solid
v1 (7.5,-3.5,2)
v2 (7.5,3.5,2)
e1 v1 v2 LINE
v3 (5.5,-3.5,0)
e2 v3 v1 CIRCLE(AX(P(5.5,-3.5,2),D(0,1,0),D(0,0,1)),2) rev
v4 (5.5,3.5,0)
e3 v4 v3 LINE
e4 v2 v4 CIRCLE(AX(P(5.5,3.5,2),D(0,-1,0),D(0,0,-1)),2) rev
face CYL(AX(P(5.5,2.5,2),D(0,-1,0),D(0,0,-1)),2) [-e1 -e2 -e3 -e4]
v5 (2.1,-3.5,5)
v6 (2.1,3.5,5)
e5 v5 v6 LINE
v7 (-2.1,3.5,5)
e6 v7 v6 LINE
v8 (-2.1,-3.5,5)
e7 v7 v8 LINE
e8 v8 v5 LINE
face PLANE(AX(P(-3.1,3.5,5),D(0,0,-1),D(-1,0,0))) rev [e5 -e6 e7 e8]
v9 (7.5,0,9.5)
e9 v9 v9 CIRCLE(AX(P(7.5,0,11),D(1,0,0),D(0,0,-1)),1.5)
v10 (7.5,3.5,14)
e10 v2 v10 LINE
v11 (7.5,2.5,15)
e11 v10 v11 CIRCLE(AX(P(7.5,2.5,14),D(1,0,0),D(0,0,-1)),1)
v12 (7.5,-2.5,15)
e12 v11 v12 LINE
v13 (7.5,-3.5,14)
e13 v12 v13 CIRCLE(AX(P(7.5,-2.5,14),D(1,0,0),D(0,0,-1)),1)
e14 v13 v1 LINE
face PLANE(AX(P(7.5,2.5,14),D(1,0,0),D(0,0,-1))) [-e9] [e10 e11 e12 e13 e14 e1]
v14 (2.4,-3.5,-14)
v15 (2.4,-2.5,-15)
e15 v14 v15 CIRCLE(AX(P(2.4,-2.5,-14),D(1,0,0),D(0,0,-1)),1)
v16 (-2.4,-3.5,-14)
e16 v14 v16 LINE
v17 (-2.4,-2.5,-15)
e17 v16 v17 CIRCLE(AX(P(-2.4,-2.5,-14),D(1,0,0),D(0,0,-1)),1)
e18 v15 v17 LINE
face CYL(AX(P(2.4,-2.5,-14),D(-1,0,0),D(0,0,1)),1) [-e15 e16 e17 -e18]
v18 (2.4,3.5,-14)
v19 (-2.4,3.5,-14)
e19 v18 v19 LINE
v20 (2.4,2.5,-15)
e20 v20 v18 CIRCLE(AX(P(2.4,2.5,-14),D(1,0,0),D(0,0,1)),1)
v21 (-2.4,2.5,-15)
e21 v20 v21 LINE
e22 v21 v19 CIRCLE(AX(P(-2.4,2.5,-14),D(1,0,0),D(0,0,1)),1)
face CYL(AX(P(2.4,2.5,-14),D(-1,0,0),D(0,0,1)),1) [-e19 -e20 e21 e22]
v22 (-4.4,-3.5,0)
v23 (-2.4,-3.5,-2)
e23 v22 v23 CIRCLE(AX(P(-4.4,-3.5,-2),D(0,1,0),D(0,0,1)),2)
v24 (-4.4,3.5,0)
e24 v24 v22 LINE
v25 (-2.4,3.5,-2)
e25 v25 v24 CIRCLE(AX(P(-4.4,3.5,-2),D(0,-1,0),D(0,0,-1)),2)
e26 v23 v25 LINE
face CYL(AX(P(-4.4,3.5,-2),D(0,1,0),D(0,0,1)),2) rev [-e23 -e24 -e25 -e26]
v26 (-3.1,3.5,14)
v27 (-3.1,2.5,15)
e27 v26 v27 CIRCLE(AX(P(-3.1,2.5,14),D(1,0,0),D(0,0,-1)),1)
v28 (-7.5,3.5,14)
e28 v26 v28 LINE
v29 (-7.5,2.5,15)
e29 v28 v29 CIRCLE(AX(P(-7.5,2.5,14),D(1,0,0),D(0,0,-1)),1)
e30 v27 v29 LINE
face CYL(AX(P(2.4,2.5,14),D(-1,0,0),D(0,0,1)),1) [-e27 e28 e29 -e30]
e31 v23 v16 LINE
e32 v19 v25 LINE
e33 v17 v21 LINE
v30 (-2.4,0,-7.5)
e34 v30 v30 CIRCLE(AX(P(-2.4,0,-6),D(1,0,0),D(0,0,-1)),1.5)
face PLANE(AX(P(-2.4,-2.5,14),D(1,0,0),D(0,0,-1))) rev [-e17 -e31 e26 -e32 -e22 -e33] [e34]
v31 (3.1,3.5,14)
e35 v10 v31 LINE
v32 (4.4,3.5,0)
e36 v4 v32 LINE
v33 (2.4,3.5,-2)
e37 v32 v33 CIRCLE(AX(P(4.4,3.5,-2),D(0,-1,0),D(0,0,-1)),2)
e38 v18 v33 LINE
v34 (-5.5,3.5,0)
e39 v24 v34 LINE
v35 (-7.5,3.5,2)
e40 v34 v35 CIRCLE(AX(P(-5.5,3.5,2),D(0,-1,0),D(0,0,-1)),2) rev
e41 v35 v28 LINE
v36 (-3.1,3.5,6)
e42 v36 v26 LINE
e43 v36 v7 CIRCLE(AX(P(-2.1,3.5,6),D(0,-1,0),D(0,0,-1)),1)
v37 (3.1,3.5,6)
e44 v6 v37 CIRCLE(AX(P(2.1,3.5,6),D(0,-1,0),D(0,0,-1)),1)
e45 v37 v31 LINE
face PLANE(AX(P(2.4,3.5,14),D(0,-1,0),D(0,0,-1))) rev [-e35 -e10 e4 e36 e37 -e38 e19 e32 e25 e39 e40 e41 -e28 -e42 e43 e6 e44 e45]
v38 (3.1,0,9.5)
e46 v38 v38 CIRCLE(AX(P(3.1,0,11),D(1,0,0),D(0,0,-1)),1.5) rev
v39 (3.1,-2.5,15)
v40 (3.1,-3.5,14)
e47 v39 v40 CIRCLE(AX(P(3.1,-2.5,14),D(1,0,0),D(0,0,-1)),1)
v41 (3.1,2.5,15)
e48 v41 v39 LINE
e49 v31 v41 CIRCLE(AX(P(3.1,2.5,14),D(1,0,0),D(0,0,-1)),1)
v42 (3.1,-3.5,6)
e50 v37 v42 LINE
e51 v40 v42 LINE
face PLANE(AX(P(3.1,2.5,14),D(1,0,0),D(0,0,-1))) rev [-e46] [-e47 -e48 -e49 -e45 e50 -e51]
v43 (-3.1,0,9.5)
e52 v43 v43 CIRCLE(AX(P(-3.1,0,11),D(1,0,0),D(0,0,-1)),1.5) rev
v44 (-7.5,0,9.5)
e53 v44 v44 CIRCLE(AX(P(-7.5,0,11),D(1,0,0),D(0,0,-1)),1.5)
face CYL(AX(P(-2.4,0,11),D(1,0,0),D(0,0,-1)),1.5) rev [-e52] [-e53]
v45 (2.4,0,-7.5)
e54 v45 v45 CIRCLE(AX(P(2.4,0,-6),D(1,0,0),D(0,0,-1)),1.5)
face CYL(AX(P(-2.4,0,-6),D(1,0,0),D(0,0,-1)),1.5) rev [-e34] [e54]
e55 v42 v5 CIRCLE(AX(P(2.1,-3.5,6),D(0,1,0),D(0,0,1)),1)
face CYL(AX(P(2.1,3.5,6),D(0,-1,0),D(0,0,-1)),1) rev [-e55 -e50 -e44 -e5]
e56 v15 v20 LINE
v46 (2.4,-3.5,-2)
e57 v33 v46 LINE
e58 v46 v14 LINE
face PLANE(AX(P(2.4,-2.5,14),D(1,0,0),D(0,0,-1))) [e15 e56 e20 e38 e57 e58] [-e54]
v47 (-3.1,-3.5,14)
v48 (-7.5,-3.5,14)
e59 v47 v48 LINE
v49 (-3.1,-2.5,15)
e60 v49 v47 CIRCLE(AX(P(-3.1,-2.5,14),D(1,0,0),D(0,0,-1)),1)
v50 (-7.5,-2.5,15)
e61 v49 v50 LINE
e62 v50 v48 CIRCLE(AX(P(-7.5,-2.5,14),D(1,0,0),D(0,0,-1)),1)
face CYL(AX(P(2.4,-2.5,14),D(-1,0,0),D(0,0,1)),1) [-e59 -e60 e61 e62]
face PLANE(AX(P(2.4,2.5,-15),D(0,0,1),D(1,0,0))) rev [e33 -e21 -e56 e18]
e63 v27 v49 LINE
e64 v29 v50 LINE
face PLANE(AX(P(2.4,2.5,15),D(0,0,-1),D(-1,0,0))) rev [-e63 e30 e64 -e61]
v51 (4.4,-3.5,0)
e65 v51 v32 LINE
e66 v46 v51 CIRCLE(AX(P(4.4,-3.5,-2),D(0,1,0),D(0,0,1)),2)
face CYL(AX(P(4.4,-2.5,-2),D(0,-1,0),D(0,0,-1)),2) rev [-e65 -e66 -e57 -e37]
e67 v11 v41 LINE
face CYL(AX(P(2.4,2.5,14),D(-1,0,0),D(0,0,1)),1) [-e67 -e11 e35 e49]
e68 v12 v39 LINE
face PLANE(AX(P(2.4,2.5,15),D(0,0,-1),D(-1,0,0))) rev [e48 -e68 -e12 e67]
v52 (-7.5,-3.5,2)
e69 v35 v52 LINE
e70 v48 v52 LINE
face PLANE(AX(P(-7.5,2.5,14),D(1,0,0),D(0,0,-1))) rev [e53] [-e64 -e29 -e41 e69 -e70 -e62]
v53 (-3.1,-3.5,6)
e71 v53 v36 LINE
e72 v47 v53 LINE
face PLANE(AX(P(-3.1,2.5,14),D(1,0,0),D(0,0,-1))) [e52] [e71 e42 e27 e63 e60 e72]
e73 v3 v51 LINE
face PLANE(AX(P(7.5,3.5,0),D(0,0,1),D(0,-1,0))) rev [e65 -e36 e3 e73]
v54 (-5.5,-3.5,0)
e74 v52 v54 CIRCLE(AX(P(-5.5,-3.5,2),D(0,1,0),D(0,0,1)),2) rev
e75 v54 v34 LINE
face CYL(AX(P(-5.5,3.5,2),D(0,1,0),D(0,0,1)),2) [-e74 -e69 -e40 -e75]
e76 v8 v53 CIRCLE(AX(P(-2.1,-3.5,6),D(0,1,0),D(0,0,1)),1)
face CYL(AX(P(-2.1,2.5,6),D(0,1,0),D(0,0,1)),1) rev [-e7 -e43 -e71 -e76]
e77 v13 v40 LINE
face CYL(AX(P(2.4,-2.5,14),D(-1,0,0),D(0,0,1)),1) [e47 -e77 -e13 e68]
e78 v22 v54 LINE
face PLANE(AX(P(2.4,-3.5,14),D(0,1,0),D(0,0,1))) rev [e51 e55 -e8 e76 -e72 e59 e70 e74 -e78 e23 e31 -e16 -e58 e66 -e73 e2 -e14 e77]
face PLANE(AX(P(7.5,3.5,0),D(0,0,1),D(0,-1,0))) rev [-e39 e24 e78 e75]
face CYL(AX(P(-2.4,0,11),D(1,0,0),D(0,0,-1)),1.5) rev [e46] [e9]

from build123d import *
from build123d.topology import SkipClean

# Parameters (mm, degrees)
SALIENTE_EXTRUIR1_DEPTH    = 2.4
CORTAR_EXTRUIR1_DEPTH      = 16.588778015
CORTAR_EXTRUIR1_DEPTH_BACK = 16.588778015
CROQUIS2_R                 = 1.5
CROQUIS3_R                 = 1.5
SALIENTE_EXTRUIR2_DEPTH    = 7.5
CORTAR_EXTRUIR2_DEPTH      = 3.1
REDONDEO1_R                = 2
REDONDEO2_R                = 1


with BuildPart() as part:
    # Croquis1 → Saliente-Extruir1 (new, symmetric)
    with BuildSketch(Plane(origin=(0, 0, 0), x_dir=(0, 0, -1), z_dir=(1, 0, 0))):
        with BuildLine():
            Line((-14, 3.5), (14, 3.5))
            ThreePointArc((14, 3.5), (14.707106781, 3.207106781), (15, 2.5))
            Line((15, 2.5), (15, -2.5))
            ThreePointArc((15, -2.5), (14.707106781, -3.207106781), (14, -3.5))
            Line((14, -3.5), (-14, -3.5))
            ThreePointArc((-14, -3.5), (-14.707106781, -3.207106781), (-15, -2.5))
            Line((-15, -2.5), (-15, 2.5))
            ThreePointArc((-15, 2.5), (-14.707106781, 3.207106781), (-14, 3.5))
        make_face()
    extrude(amount=SALIENTE_EXTRUIR1_DEPTH, both=True)

    # Croquis2 → Cortar-Extruir1 (cut, two sides: drawn at the far end of the back side and taken through both)
    with BuildSketch(Plane(origin=(0, 0, 0), x_dir=(0, 0, -1), z_dir=(1, 0, 0)).offset(-CORTAR_EXTRUIR1_DEPTH_BACK)):
        with Locations((-11, 0)):
            Circle(CROQUIS2_R)
        with Locations((6, 0)):
            Circle(CROQUIS2_R)
    extrude(amount=CORTAR_EXTRUIR1_DEPTH + CORTAR_EXTRUIR1_DEPTH_BACK, mode=Mode.SUBTRACT)

    # Croquis3 → Saliente-Extruir2 (add, symmetric)
    with SkipClean():  # the faces are left unmerged after this step: merging them gives an invalid solid
        with BuildSketch(Plane(origin=(0, 0, 0), x_dir=(0, 0, -1), z_dir=(1, 0, 0))):
            with BuildLine():
                Line((-15, 2.5), (-15, -2.5))
                ThreePointArc((-15, -2.5), (-14.707106781, -3.207106781), (-14, -3.5))
                Line((-14, -3.5), (0, -3.5))
                Line((0, -3.5), (0, 3.5))
                Line((0, 3.5), (-14, 3.5))
                ThreePointArc((-14, 3.5), (-14.707106781, 3.207106781), (-15, 2.5))
            make_face()
            with Locations((-11, 0)):
                Circle(CROQUIS3_R, mode=Mode.SUBTRACT)
        extrude(amount=SALIENTE_EXTRUIR2_DEPTH, both=True)
    add(part.part.scale(1), mode=Mode.REPLACE)  # the faces are merged on a copy

    # Croquis4 → Cortar-Extruir2 (cut, symmetric)
    with BuildSketch(Plane(origin=(0, 0, 0), x_dir=(0, 0, -1), z_dir=(1, 0, 0))):
        with BuildLine():
            Line((-14, 3.5), (-5, 3.5))
            Line((-5, 3.5), (-5, -3.5))
            Line((-5, -3.5), (-14, -3.5))
            ThreePointArc((-14, -3.5), (-14.707106781, -3.207106781), (-15, -2.5))
            Line((-15, -2.5), (-15, 2.5))
            ThreePointArc((-15, 2.5), (-14.707106781, 3.207106781), (-14, 3.5))
        make_face()
    extrude(amount=CORTAR_EXTRUIR2_DEPTH, both=True, mode=Mode.SUBTRACT)

    # Redondeo1
    redondeo1_edges = [part.edges().sort_by_distance(p)[0] for p in [
        (-2.4, 0, 0),
        (2.4, 0, 0),
        (-7.5, 0, 0),
        (7.5, 0, 0),
    ]]
    fillet(redondeo1_edges, radius=REDONDEO1_R)

    # Redondeo2
    redondeo2_edges = [part.edges().sort_by_distance(p)[0] for p in [
        (3.1, 0, 5),
        (-3.1, 0, 5),
    ]]
    fillet(redondeo2_edges, radius=REDONDEO2_R)


solid = part.part
